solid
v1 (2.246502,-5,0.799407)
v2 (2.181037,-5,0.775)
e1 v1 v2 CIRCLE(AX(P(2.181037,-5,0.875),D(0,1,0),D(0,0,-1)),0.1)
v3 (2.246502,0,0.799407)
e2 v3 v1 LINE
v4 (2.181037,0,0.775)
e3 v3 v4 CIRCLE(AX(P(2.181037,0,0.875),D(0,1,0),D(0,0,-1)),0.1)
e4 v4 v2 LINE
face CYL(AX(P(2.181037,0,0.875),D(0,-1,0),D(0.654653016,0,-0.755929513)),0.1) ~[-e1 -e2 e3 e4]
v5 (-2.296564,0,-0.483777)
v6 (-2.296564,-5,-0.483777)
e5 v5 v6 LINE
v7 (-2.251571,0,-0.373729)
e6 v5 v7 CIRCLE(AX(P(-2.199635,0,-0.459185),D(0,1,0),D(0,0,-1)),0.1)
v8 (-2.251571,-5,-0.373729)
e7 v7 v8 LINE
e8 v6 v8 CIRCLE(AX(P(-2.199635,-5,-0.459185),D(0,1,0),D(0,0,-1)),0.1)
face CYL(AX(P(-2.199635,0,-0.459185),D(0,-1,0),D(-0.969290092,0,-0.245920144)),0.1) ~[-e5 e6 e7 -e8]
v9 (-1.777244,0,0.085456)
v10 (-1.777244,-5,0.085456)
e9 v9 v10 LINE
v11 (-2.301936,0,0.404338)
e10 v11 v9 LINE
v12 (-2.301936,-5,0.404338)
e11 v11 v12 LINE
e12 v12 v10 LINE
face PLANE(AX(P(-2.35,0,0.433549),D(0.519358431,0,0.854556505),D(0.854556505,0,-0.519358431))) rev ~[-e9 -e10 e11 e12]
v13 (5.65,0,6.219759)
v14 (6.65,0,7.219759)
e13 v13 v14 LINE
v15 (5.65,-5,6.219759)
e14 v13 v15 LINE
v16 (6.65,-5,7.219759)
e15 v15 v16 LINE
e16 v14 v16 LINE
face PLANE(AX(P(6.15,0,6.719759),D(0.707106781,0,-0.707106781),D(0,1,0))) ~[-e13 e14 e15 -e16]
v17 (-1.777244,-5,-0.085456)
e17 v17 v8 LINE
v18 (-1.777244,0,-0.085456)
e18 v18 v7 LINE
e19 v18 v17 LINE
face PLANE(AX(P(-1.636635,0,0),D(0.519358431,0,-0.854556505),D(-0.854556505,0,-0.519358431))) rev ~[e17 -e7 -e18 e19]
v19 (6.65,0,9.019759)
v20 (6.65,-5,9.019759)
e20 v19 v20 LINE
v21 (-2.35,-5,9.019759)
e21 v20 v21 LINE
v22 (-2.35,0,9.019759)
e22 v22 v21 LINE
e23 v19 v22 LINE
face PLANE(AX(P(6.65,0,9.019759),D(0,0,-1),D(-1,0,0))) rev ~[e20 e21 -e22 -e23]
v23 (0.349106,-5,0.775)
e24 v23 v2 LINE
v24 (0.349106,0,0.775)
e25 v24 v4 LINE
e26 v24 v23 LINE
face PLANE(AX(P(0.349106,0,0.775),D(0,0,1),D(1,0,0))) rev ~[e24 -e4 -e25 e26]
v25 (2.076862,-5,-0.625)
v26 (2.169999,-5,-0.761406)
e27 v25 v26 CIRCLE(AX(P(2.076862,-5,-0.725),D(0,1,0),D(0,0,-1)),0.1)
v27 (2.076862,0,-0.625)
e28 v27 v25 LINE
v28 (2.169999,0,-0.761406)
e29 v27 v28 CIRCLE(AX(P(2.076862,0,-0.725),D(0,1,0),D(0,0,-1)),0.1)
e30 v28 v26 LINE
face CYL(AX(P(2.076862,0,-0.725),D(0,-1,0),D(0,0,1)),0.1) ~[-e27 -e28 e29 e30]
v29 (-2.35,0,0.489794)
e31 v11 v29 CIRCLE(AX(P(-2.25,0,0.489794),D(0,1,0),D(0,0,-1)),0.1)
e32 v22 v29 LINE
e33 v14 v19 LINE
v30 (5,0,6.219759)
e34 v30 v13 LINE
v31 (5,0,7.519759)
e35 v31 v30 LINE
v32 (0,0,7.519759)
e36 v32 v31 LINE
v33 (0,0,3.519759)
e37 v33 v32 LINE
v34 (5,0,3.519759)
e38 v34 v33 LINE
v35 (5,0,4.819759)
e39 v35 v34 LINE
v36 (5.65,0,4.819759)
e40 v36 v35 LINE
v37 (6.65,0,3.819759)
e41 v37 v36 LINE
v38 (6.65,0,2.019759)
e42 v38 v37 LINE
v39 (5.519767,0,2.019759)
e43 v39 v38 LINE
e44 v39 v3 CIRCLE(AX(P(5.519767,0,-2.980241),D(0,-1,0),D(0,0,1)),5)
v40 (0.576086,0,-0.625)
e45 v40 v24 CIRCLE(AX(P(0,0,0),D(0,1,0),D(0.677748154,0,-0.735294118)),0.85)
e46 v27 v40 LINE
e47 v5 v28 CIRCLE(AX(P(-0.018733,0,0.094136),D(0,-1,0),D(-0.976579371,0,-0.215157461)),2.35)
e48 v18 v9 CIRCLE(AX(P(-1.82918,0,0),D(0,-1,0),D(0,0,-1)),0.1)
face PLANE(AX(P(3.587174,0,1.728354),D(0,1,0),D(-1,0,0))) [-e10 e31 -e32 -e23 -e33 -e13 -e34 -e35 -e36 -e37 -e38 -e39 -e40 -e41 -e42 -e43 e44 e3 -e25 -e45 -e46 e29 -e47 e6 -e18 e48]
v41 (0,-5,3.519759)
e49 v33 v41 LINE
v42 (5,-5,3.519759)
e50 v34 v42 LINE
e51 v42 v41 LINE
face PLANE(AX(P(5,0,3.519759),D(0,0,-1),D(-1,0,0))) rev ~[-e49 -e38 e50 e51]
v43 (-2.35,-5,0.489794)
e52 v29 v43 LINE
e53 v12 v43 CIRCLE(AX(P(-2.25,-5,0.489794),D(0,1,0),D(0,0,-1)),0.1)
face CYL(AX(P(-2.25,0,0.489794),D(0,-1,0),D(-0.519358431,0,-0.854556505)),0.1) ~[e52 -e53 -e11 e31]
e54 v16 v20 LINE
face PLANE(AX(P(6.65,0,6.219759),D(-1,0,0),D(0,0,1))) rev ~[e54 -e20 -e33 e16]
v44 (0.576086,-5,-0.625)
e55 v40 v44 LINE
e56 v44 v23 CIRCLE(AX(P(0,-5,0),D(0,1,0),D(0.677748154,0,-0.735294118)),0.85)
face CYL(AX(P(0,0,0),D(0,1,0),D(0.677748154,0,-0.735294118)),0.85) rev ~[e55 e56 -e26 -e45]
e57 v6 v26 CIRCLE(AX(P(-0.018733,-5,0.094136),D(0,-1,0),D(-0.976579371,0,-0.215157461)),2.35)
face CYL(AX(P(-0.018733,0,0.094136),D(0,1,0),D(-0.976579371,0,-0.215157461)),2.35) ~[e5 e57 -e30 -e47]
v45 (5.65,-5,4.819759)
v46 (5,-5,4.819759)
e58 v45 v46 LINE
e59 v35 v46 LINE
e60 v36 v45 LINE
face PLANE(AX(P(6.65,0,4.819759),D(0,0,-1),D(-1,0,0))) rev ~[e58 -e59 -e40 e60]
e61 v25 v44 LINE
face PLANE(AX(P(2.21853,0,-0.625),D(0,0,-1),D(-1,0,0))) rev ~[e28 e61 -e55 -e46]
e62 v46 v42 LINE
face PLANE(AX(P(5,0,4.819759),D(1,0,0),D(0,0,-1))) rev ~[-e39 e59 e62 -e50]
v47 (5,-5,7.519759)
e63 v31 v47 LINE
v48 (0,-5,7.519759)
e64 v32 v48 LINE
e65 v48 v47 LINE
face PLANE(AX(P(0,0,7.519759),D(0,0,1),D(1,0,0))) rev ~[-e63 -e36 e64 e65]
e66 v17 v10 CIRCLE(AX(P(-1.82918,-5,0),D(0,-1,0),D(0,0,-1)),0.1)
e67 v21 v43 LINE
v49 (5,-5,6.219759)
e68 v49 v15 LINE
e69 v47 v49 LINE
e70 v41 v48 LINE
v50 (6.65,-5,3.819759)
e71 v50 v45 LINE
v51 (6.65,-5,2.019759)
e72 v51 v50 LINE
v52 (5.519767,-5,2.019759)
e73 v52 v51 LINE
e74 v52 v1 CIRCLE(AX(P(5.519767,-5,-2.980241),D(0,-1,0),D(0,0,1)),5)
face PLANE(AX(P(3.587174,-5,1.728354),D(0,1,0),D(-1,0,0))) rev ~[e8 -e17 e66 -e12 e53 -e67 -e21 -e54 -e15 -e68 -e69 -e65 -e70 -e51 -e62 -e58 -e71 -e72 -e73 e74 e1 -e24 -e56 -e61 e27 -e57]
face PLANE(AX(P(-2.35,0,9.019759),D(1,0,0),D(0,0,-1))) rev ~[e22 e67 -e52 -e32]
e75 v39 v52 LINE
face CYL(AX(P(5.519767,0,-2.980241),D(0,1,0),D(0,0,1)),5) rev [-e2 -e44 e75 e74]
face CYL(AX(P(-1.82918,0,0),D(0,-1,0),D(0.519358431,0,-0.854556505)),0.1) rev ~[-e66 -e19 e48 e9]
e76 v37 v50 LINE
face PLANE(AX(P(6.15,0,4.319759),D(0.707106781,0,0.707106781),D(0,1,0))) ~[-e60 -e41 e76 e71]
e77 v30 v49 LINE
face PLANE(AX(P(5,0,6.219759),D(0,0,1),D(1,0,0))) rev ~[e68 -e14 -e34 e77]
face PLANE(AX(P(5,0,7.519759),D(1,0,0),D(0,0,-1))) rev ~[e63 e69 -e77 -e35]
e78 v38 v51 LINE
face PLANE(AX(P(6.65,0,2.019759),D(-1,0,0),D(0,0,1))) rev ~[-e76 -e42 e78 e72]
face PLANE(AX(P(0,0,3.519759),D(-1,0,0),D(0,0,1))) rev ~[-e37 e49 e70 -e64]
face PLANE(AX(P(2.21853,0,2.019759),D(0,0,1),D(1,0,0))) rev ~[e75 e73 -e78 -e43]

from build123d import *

# Parameters (mm, degrees)
F1_DEPTH    = 5
F2_SIZE     = 1
F3_T1_DEPTH = 5
F4_R        = 0.1


# Not quite as in the source:
# - a fillet or chamfer that OpenCascade refuses, or shapes differently, is made with other operations: its cross-section is extruded or revolved along the edge and cut away or added


with BuildPart() as f1:
    # F0 (on Front) → F1 (new body)
    with BuildSketch(Plane.XZ):
        with BuildLine():
            ThreePointArc((0.5760859311, -0.625), (-0.8390441156, -0.1360329819), (0.3491060011, 0.775))
            Line((0.3491060011, 0.775), (2.2185299187, 0.775))
            Line((2.2185299187, 0.775), (2.2185299187, 2.0197594836))
            Line((2.2185299187, 2.0197594836), (6.65, 2.0197594836))
            Line((6.65, 2.0197594836), (6.65, 4.8197594836))
            Line((6.65, 4.8197594836), (5, 4.8197594836))
            Line((5, 4.8197594836), (5, 3.5197594836))
            Line((5, 3.5197594836), (0, 3.5197594836))
            Line((0, 3.5197594836), (0, 7.5197594836))
            Line((0, 7.5197594836), (5, 7.5197594836))
            Line((5, 7.5197594836), (5, 6.2197594836))
            Line((5, 6.2197594836), (6.65, 6.2197594836))
            Line((6.65, 6.2197594836), (6.65, 9.0197594836))
            Line((6.65, 9.0197594836), (-2.35, 9.0197594836))
            Line((-2.35, 9.0197594836), (-2.35, 0.4335492267))
            Line((-2.35, 0.4335492267), (-1.6366346435, 0))
            Line((-1.6366346435, 0), (-2.3136941642, -0.4114842822))
            ThreePointArc((-2.3136941642, -0.4114842822), (-0.1293198619, -2.2532607786), (2.2185299187, -0.625))
            Line((2.2185299187, -0.625), (0.5760859311, -0.625))
        make_face()
    extrude(amount=F1_DEPTH)

    # F2
    f2_edges = [f1.edges().sort_by_distance(p)[0] for p in [
        (6.65, -2.5, 6.219759),
        (6.65, -2.5, 4.819759),
    ]]
    chamfer(f2_edges, length=F2_SIZE)

    # F3: fillet of radius 5 on 1 edges, made by hand

    # F3_s2 → F3_t1 (join)
    with BuildSketch(Plane.XZ):
        with BuildLine():
            ThreePointArc((5.5197673631, 2.0197594836), (3.7557099068, 1.6982315944), (2.2185299187, 0.775))
            Line((2.2185299187, 0.775), (2.2185299187, 2.0197594836))
            Line((2.2185299187, 2.0197594836), (5.5197673631, 2.0197594836))
        make_face()
    extrude(amount=F3_T1_DEPTH)

    # F4
    f4_edges = [f1.edges().sort_by_distance(p)[0] for p in [
        (-1.636635, -2.5, 0),
        (-2.313694, -2.5, -0.411484),
        (-2.35, -2.5, 0.433549),
        (2.21853, -2.5, -0.625),
        (2.21853, -2.5, 0.775),
    ]]
    fillet(f4_edges, radius=F4_R)


solid = f1.part
